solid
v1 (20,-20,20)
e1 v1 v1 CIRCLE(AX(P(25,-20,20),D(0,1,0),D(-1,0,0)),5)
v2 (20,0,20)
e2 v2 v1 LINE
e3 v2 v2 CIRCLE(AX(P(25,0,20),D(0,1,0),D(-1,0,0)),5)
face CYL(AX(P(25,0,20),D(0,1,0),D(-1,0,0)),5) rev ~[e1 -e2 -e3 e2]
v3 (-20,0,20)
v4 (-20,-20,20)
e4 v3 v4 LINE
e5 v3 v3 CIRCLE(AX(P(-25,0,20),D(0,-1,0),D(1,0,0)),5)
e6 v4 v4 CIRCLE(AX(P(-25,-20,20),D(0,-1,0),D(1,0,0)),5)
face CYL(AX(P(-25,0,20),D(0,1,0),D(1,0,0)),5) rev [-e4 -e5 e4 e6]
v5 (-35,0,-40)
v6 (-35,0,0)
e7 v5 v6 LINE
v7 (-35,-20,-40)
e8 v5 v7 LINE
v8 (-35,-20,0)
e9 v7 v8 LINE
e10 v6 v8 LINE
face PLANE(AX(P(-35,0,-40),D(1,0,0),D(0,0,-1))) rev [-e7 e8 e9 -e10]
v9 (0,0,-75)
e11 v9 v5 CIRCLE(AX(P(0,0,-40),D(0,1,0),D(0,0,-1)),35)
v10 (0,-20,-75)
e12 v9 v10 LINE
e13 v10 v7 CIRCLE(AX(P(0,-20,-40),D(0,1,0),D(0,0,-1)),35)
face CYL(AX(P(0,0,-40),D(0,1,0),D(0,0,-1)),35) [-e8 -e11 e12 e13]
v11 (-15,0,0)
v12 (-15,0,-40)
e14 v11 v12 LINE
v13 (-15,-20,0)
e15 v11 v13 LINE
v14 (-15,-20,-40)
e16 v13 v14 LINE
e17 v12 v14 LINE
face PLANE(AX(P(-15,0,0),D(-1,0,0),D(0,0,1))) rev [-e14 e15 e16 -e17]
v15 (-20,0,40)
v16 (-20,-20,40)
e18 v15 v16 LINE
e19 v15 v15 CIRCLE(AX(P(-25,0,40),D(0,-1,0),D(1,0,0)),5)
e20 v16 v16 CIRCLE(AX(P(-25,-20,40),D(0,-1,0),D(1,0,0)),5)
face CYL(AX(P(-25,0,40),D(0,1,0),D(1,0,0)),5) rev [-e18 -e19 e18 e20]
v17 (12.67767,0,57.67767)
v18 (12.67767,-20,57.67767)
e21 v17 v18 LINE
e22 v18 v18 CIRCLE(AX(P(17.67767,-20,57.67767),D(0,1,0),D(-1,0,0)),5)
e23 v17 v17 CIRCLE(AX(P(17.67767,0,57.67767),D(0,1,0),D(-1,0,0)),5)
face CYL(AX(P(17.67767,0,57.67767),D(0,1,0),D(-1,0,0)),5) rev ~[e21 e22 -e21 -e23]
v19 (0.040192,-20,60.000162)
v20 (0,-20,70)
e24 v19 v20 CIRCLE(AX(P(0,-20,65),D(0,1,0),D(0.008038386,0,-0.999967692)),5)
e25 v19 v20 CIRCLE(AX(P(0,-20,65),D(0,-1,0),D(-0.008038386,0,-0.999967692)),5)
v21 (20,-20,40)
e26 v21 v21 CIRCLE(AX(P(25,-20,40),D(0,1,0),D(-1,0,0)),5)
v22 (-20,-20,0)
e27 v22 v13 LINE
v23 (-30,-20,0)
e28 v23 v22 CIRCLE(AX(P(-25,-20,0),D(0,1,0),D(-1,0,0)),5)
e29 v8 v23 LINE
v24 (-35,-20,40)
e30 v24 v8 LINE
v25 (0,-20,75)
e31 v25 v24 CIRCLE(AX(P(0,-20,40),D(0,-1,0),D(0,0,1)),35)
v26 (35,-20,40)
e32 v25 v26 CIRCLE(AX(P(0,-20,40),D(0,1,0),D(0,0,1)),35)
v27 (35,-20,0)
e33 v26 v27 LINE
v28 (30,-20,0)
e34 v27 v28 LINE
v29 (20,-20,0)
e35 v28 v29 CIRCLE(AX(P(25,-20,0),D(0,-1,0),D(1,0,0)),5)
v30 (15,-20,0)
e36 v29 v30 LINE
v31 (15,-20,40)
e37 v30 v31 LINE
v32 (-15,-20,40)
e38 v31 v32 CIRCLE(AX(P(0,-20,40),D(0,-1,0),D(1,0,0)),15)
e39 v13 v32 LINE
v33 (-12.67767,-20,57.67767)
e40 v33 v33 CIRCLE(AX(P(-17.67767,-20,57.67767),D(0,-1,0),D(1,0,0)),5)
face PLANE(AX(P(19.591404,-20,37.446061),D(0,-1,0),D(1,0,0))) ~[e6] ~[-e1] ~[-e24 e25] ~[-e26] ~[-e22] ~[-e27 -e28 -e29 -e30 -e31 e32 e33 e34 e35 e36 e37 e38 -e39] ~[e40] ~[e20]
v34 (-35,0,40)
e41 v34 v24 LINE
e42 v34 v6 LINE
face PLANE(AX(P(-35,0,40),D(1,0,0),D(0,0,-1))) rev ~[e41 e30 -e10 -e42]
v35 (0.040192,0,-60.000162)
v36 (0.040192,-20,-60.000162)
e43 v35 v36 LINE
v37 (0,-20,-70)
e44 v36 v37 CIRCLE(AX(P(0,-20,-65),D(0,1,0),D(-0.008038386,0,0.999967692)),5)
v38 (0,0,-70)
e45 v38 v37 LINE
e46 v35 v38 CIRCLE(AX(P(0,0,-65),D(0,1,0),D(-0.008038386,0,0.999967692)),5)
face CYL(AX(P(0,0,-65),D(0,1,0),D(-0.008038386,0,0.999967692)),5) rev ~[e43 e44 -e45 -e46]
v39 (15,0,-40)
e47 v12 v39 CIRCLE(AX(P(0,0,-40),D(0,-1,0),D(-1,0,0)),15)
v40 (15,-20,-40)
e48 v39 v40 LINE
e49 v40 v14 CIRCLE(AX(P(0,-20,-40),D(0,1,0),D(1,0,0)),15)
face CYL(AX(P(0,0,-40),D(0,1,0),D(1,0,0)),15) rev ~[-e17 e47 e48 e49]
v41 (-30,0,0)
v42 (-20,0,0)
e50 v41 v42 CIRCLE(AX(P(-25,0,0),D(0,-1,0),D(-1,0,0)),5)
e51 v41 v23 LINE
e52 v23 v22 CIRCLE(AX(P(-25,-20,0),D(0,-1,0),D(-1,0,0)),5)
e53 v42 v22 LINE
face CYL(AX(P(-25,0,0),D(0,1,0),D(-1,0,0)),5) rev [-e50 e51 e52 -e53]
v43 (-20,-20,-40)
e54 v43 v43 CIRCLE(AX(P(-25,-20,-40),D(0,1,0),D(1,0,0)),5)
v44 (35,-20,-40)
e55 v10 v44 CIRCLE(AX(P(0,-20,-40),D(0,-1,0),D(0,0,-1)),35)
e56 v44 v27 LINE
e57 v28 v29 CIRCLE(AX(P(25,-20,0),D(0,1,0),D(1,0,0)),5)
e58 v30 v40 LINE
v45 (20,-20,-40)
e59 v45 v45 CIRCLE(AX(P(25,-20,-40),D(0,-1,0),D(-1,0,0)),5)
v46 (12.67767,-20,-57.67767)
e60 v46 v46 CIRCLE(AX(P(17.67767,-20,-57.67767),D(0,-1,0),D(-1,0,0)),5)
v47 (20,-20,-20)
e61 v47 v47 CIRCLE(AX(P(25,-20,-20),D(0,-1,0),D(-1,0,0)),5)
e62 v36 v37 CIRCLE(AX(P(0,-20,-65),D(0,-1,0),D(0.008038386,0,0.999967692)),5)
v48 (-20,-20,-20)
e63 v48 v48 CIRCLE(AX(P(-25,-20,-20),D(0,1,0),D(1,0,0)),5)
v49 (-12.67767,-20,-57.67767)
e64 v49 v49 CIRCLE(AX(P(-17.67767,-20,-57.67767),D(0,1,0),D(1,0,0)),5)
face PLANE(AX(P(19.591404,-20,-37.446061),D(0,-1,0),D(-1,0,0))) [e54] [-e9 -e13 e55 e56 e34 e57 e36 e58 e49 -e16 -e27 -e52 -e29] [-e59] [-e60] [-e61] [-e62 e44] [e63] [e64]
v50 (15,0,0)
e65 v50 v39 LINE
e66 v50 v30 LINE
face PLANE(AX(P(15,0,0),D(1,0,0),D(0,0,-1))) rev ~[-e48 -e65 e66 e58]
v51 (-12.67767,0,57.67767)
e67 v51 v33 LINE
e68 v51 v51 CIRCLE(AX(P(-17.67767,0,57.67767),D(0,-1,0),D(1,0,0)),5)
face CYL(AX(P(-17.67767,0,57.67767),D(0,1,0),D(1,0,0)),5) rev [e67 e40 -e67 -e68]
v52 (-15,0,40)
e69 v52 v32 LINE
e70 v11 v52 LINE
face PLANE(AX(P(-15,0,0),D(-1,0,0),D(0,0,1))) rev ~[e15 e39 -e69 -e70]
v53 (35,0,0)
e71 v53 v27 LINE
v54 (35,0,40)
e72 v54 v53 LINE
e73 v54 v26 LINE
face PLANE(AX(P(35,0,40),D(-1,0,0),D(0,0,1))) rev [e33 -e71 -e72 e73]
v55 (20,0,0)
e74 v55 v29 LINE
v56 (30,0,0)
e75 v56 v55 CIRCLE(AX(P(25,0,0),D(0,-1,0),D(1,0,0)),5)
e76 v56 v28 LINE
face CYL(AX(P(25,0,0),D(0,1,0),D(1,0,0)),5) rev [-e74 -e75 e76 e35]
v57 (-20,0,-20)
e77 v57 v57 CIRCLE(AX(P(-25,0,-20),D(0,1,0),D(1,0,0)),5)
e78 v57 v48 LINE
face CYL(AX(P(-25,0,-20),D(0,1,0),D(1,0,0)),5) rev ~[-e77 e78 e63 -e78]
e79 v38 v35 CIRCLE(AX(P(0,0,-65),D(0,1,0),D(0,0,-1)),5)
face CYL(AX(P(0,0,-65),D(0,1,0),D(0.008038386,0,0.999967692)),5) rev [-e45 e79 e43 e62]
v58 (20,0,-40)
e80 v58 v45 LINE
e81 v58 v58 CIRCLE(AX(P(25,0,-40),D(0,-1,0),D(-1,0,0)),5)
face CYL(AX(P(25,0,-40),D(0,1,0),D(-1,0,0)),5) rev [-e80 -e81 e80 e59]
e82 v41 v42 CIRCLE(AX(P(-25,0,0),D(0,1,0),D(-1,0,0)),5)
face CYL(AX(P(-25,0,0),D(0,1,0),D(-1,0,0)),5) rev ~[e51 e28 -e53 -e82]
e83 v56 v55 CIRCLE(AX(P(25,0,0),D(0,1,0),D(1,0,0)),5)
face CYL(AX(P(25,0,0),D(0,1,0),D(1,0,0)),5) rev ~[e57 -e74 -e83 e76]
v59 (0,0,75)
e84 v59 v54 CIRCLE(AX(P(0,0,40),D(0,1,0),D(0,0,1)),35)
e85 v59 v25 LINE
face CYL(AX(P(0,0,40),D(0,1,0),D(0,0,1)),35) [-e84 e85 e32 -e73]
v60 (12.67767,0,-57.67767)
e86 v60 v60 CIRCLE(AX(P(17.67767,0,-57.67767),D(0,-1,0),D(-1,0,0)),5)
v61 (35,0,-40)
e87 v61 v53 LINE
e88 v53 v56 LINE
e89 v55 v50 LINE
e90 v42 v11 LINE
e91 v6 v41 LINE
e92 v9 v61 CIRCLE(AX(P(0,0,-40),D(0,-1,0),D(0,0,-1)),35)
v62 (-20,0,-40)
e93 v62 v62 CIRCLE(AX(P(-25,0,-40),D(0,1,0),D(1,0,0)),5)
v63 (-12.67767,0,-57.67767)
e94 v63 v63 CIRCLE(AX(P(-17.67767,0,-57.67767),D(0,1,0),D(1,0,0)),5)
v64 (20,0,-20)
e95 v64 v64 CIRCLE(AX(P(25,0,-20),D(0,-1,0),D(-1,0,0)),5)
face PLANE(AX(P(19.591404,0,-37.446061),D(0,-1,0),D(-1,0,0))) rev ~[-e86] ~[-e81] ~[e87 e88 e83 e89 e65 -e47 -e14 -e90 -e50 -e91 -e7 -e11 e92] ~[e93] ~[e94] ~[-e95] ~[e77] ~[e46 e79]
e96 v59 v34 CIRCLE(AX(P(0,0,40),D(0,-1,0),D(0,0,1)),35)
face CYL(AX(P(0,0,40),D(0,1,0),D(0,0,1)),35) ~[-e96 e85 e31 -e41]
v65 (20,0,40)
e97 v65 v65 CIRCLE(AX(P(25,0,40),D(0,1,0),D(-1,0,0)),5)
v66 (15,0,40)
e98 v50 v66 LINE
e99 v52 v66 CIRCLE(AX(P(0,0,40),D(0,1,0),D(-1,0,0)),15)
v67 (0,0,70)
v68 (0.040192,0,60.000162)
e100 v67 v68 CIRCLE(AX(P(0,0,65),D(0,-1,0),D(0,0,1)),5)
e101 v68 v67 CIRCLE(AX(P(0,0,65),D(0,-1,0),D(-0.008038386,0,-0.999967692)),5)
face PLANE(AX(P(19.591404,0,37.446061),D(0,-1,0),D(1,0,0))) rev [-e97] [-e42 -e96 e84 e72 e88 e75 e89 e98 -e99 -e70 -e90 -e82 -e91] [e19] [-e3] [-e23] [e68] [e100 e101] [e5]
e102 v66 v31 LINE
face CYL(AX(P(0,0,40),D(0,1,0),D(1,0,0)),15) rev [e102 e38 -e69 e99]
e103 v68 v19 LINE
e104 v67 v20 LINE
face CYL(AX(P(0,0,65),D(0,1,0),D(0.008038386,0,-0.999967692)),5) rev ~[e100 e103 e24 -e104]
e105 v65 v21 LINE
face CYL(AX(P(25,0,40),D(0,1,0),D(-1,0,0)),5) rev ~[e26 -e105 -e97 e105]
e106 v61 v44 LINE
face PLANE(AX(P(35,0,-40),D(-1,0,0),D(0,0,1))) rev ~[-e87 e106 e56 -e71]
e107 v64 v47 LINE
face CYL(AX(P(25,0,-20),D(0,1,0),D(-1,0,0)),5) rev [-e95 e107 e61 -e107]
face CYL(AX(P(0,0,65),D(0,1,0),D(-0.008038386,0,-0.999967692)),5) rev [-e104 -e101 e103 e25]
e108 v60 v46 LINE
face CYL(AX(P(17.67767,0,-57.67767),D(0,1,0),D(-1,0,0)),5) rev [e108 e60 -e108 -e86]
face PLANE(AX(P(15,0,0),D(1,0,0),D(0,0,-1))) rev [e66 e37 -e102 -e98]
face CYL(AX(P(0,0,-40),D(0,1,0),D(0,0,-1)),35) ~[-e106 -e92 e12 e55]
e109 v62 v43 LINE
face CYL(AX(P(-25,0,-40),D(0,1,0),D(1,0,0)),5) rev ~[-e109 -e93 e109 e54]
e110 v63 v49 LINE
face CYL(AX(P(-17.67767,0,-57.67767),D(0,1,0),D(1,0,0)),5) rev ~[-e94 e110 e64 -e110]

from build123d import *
from build123d import SkipClean  # not in build123d's __all__

# Parameters (mm, degrees)
F0_R     = 5
F1_DEPTH = 20


with BuildPart() as f1:
    # F0 (on Front) → F1 (new body)
    with BuildSketch(Plane.XZ):
        with BuildLine():
            ThreePointArc((-15, 40), (-10.6066017178, 50.6066017178), (0, 55))
            Line((0, 55), (0.0401919294, 60.0001615417))
            ThreePointArc((0.0401919294, 60.0001615417), (-4.9999596144, 64.979903873), (0, 70))
            Line((0, 70), (0, 75))
            ThreePointArc((0, 75), (-24.7487373415, 64.7487373415), (-35, 40))
            Line((-35, 40), (-35, 0))
            Line((-35, 0), (-30, 0))
            ThreePointArc((-30, 0), (-25, 5), (-20, 0))
            Line((-20, 0), (-15, 0))
            Line((-15, 0), (-15, 40))
        make_face()
        with Locations((-25, 20)):
            Circle(F0_R, mode=Mode.SUBTRACT)
        with Locations((-25, 40)):
            Circle(F0_R, mode=Mode.SUBTRACT)
        with Locations((-17.6776695297, 57.6776695297)):
            Circle(F0_R, mode=Mode.SUBTRACT)
    extrude(amount=F1_DEPTH)

    # F2: F1 across plane


with BuildPart() as f1_1:
    add(f1.part, clean=False)
    add(f1.part.mirror(Plane.YZ), clean=False)

    # F3: F1 across plane


with BuildPart() as f1_2:
    add(f1_1.part, clean=False)
    with SkipClean():  # cleaning this boolean's faces spoils the solid; the shape is the same uncleaned
        add(f1_1.part.mirror(Plane.XY), clean=False)


solid = f1_2.part
